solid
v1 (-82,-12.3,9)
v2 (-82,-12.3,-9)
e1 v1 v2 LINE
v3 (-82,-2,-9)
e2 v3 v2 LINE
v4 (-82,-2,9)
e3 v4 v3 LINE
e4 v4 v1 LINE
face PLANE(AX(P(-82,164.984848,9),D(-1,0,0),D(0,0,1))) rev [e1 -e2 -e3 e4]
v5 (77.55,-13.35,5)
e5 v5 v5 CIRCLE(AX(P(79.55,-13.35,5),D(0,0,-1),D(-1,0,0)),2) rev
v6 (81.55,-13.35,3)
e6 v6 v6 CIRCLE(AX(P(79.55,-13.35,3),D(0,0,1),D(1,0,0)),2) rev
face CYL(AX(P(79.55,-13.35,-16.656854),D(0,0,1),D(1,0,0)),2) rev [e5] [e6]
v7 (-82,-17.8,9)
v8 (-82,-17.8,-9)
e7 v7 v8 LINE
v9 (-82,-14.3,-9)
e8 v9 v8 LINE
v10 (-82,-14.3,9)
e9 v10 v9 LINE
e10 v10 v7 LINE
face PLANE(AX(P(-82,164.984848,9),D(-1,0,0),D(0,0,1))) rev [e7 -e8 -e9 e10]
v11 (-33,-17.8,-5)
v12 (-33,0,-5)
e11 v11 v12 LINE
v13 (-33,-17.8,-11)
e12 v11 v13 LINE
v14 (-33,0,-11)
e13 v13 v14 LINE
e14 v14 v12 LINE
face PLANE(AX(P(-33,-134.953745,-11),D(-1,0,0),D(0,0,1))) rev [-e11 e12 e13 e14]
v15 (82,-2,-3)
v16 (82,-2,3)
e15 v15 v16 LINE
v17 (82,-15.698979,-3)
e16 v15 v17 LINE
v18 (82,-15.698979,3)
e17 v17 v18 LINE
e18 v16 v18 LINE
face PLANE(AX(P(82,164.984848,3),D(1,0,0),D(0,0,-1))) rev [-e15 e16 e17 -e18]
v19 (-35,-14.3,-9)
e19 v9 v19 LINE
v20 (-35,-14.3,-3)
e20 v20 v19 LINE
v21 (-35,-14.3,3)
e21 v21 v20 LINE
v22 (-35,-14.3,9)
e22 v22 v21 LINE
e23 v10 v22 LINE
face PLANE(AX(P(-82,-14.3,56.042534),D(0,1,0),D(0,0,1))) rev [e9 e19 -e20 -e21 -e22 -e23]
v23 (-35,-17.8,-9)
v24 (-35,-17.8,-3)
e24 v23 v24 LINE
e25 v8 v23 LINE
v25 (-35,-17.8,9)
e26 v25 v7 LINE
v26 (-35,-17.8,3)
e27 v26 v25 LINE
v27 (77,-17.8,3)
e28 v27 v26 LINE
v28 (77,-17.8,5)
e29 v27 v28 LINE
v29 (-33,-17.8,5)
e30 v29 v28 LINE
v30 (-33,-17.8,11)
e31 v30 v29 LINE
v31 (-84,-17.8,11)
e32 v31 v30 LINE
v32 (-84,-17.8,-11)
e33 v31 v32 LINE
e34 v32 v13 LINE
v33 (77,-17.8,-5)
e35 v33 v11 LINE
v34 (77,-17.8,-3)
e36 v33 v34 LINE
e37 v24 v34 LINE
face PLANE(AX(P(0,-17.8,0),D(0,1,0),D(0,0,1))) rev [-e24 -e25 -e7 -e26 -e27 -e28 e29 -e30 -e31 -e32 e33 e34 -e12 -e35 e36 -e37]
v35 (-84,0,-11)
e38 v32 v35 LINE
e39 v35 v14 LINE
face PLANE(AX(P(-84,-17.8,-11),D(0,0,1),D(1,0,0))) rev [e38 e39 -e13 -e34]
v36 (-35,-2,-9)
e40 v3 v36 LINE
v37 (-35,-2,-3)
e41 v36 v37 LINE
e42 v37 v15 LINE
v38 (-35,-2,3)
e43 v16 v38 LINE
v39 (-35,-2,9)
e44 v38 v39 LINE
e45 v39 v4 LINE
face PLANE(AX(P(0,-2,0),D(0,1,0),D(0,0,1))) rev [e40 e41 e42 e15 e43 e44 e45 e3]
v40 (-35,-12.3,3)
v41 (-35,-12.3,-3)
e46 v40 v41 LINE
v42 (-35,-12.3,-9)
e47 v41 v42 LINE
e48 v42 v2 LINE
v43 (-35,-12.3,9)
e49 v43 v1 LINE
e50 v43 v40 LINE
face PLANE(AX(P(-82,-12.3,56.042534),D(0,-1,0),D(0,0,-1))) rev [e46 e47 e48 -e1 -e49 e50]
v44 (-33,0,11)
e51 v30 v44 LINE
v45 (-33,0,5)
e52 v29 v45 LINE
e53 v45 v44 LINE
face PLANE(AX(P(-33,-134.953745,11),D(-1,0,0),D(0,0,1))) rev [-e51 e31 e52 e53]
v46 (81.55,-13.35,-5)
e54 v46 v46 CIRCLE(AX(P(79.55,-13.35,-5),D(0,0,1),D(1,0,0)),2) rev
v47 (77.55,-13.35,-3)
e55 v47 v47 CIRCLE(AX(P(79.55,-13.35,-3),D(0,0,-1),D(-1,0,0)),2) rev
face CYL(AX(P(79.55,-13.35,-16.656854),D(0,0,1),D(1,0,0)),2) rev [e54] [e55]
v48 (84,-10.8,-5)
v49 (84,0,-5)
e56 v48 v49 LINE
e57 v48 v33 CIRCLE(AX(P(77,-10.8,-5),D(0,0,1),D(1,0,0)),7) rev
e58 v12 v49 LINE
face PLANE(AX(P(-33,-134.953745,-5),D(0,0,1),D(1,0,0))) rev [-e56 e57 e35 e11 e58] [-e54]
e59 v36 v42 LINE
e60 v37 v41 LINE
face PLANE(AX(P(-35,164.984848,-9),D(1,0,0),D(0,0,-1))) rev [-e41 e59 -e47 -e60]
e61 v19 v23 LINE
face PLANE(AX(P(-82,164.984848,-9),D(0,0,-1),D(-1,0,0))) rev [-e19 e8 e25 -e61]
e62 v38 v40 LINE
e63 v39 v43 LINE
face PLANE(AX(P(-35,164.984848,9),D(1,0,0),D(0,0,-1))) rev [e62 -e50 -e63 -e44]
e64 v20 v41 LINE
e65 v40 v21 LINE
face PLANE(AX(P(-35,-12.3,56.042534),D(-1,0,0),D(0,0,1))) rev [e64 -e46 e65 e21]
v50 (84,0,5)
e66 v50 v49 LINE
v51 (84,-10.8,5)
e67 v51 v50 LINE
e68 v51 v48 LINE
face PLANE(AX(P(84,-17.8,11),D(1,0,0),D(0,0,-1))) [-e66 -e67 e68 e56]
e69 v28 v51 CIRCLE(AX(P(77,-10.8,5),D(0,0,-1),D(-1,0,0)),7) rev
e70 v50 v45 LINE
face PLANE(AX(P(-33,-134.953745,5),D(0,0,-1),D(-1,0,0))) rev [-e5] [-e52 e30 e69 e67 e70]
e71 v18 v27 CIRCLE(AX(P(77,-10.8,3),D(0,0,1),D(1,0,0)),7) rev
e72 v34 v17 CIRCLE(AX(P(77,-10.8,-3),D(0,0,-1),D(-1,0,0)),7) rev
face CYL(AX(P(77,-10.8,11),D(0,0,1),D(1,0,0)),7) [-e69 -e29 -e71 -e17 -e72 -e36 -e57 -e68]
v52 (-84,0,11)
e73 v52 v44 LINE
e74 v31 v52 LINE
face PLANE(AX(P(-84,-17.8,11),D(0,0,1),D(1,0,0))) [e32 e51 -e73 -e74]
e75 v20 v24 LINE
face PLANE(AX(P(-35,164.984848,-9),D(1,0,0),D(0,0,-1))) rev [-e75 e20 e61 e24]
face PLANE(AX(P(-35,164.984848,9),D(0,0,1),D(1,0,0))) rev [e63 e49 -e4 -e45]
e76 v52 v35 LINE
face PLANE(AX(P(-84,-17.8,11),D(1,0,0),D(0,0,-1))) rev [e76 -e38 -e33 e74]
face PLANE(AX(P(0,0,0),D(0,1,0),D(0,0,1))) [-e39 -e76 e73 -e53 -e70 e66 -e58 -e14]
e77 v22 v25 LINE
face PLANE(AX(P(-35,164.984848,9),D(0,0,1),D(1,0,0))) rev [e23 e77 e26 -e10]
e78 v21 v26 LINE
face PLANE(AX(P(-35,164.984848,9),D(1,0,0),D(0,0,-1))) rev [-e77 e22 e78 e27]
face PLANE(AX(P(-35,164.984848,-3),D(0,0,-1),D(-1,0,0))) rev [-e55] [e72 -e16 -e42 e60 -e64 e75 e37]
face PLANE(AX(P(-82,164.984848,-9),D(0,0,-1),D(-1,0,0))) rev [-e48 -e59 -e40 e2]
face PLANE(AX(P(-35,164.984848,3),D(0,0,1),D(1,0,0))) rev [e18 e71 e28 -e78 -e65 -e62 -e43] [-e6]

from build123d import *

# Parameters (mm, degrees)
SKETCH1_W           = 168
SKETCH1_H           = 22
BOSS_EXTRUDE1_DEPTH = 17.8
SKETCH8_R           = 2
CUT_EXTRUDE4_DEPTH  = 22
CUT_EXTRUDE2_REACH  = 88.567
SKETCH5_W           = 117
SKETCH5_H           = 6
CUT_EXTRUDE3_DEPTH  = 15.8
BOSS_EXTRUDE3_REACH = 90.164
SKETCH7_W           = 47
SKETCH7_H           = 2
FILLET1_R           = 7


with BuildPart() as part:
    # Sketch1 → Boss-Extrude1 (new body)
    with BuildSketch(Plane(origin=(0, 0, 0), x_dir=(1, 0, 0), z_dir=(0, 1, 0))):
        Rectangle(SKETCH1_W, SKETCH1_H)
    extrude(amount=-BOSS_EXTRUDE1_DEPTH)

    # Sketch8 → Cut-Extrude4 (cut)
    with BuildSketch(Plane.XY.offset(11)):
        with Locations((79.55, -13.35)):
            Circle(SKETCH8_R)
    extrude(amount=-CUT_EXTRUDE4_DEPTH, mode=Mode.SUBTRACT)

    # Cut-Extrude2: up to this face of the body (flat: up to its plane)
    cut_extrude2_end = Plane(part.part.faces().sort_by_distance((0, -17.8, 0))[0])
    # Sketch5 → Cut-Extrude2 (cut, up to the picked face)
    with BuildSketch(Plane(origin=(0, 0, 0), x_dir=(1, 0, 0), z_dir=(0, 1, 0)), mode=Mode.PRIVATE) as cut_extrude2_sk1:
        with Locations((25.5, 8)):
            Rectangle(SKETCH5_W, SKETCH5_H)
    cut_extrude2_tool1 = split(extrude(cut_extrude2_sk1.sketch, amount=-CUT_EXTRUDE2_REACH, mode=Mode.PRIVATE), bisect_by=cut_extrude2_end, keep=Keep.BOTH, mode=Mode.PRIVATE)
    # Sketch5 → Cut-Extrude2 (cut, up to the picked face)
    with BuildSketch(Plane(origin=(0, 0, 0), x_dir=(1, 0, 0), z_dir=(0, 1, 0)), mode=Mode.PRIVATE) as cut_extrude2_sk2:
        with Locations((25.5, -8)):
            Rectangle(SKETCH5_W, SKETCH5_H)
    cut_extrude2_tool2 = split(extrude(cut_extrude2_sk2.sketch, amount=-CUT_EXTRUDE2_REACH, mode=Mode.PRIVATE), bisect_by=cut_extrude2_end, keep=Keep.BOTH, mode=Mode.PRIVATE)
    add(cut_extrude2_tool1.solids().sort_by(Axis((25.5, 0, -8), (0, -1, 0)))[0], mode=Mode.SUBTRACT)
    add(cut_extrude2_tool2.solids().sort_by(Axis((25.5, 0, 8), (0, -1, 0)))[0], mode=Mode.SUBTRACT)

    # Sketch6 → Cut-Extrude3 (cut)
    with BuildSketch(Plane.XZ.offset(17.8)):
        Polygon((-82, 9), (-82, -9), (-35, -9), (-35, -3), (82, -3), (82, 3), (-35, 3), (-35, 9), align=None)
    extrude(amount=-CUT_EXTRUDE3_DEPTH, mode=Mode.SUBTRACT)

    # Boss-Extrude3: up to this face of the body (flat: up to its plane)
    boss_extrude3_end = Plane(part.part.faces().sort_by_distance((-58.5, -9.9, 9))[0])
    # Sketch7 → Boss-Extrude3 (add, up to the picked face)
    with BuildSketch(Plane.XY.offset(-9), mode=Mode.PRIVATE) as boss_extrude3_sk1:
        with Locations((-58.5, -13.3)):
            Rectangle(SKETCH7_W, SKETCH7_H)
    boss_extrude3_tool1 = split(extrude(boss_extrude3_sk1.sketch, amount=BOSS_EXTRUDE3_REACH, mode=Mode.PRIVATE), bisect_by=boss_extrude3_end, keep=Keep.BOTH, mode=Mode.PRIVATE)
    add(boss_extrude3_tool1.solids().sort_by(Axis((-58.5, -13.3, -9), (0, 0, 1)))[0])

    # Fillet1
    # the kernel refuses this fillet: 7 mm, written as the material it takes off along each edge
    with BuildSketch(Plane(origin=(84, -17.8, 22.5), x_dir=(-1, 0, 0), z_dir=(0, 0, -1))) as fillet1_piece_1:
        with BuildLine():
            CenterArc((FILLET1_R, FILLET1_R), FILLET1_R, 180, 90)
            Line((0, FILLET1_R), (0, 0))
            Line((0, 0), (FILLET1_R, 0))
        make_face()
    extrude(amount=45, mode=Mode.SUBTRACT)


solid = part.part
